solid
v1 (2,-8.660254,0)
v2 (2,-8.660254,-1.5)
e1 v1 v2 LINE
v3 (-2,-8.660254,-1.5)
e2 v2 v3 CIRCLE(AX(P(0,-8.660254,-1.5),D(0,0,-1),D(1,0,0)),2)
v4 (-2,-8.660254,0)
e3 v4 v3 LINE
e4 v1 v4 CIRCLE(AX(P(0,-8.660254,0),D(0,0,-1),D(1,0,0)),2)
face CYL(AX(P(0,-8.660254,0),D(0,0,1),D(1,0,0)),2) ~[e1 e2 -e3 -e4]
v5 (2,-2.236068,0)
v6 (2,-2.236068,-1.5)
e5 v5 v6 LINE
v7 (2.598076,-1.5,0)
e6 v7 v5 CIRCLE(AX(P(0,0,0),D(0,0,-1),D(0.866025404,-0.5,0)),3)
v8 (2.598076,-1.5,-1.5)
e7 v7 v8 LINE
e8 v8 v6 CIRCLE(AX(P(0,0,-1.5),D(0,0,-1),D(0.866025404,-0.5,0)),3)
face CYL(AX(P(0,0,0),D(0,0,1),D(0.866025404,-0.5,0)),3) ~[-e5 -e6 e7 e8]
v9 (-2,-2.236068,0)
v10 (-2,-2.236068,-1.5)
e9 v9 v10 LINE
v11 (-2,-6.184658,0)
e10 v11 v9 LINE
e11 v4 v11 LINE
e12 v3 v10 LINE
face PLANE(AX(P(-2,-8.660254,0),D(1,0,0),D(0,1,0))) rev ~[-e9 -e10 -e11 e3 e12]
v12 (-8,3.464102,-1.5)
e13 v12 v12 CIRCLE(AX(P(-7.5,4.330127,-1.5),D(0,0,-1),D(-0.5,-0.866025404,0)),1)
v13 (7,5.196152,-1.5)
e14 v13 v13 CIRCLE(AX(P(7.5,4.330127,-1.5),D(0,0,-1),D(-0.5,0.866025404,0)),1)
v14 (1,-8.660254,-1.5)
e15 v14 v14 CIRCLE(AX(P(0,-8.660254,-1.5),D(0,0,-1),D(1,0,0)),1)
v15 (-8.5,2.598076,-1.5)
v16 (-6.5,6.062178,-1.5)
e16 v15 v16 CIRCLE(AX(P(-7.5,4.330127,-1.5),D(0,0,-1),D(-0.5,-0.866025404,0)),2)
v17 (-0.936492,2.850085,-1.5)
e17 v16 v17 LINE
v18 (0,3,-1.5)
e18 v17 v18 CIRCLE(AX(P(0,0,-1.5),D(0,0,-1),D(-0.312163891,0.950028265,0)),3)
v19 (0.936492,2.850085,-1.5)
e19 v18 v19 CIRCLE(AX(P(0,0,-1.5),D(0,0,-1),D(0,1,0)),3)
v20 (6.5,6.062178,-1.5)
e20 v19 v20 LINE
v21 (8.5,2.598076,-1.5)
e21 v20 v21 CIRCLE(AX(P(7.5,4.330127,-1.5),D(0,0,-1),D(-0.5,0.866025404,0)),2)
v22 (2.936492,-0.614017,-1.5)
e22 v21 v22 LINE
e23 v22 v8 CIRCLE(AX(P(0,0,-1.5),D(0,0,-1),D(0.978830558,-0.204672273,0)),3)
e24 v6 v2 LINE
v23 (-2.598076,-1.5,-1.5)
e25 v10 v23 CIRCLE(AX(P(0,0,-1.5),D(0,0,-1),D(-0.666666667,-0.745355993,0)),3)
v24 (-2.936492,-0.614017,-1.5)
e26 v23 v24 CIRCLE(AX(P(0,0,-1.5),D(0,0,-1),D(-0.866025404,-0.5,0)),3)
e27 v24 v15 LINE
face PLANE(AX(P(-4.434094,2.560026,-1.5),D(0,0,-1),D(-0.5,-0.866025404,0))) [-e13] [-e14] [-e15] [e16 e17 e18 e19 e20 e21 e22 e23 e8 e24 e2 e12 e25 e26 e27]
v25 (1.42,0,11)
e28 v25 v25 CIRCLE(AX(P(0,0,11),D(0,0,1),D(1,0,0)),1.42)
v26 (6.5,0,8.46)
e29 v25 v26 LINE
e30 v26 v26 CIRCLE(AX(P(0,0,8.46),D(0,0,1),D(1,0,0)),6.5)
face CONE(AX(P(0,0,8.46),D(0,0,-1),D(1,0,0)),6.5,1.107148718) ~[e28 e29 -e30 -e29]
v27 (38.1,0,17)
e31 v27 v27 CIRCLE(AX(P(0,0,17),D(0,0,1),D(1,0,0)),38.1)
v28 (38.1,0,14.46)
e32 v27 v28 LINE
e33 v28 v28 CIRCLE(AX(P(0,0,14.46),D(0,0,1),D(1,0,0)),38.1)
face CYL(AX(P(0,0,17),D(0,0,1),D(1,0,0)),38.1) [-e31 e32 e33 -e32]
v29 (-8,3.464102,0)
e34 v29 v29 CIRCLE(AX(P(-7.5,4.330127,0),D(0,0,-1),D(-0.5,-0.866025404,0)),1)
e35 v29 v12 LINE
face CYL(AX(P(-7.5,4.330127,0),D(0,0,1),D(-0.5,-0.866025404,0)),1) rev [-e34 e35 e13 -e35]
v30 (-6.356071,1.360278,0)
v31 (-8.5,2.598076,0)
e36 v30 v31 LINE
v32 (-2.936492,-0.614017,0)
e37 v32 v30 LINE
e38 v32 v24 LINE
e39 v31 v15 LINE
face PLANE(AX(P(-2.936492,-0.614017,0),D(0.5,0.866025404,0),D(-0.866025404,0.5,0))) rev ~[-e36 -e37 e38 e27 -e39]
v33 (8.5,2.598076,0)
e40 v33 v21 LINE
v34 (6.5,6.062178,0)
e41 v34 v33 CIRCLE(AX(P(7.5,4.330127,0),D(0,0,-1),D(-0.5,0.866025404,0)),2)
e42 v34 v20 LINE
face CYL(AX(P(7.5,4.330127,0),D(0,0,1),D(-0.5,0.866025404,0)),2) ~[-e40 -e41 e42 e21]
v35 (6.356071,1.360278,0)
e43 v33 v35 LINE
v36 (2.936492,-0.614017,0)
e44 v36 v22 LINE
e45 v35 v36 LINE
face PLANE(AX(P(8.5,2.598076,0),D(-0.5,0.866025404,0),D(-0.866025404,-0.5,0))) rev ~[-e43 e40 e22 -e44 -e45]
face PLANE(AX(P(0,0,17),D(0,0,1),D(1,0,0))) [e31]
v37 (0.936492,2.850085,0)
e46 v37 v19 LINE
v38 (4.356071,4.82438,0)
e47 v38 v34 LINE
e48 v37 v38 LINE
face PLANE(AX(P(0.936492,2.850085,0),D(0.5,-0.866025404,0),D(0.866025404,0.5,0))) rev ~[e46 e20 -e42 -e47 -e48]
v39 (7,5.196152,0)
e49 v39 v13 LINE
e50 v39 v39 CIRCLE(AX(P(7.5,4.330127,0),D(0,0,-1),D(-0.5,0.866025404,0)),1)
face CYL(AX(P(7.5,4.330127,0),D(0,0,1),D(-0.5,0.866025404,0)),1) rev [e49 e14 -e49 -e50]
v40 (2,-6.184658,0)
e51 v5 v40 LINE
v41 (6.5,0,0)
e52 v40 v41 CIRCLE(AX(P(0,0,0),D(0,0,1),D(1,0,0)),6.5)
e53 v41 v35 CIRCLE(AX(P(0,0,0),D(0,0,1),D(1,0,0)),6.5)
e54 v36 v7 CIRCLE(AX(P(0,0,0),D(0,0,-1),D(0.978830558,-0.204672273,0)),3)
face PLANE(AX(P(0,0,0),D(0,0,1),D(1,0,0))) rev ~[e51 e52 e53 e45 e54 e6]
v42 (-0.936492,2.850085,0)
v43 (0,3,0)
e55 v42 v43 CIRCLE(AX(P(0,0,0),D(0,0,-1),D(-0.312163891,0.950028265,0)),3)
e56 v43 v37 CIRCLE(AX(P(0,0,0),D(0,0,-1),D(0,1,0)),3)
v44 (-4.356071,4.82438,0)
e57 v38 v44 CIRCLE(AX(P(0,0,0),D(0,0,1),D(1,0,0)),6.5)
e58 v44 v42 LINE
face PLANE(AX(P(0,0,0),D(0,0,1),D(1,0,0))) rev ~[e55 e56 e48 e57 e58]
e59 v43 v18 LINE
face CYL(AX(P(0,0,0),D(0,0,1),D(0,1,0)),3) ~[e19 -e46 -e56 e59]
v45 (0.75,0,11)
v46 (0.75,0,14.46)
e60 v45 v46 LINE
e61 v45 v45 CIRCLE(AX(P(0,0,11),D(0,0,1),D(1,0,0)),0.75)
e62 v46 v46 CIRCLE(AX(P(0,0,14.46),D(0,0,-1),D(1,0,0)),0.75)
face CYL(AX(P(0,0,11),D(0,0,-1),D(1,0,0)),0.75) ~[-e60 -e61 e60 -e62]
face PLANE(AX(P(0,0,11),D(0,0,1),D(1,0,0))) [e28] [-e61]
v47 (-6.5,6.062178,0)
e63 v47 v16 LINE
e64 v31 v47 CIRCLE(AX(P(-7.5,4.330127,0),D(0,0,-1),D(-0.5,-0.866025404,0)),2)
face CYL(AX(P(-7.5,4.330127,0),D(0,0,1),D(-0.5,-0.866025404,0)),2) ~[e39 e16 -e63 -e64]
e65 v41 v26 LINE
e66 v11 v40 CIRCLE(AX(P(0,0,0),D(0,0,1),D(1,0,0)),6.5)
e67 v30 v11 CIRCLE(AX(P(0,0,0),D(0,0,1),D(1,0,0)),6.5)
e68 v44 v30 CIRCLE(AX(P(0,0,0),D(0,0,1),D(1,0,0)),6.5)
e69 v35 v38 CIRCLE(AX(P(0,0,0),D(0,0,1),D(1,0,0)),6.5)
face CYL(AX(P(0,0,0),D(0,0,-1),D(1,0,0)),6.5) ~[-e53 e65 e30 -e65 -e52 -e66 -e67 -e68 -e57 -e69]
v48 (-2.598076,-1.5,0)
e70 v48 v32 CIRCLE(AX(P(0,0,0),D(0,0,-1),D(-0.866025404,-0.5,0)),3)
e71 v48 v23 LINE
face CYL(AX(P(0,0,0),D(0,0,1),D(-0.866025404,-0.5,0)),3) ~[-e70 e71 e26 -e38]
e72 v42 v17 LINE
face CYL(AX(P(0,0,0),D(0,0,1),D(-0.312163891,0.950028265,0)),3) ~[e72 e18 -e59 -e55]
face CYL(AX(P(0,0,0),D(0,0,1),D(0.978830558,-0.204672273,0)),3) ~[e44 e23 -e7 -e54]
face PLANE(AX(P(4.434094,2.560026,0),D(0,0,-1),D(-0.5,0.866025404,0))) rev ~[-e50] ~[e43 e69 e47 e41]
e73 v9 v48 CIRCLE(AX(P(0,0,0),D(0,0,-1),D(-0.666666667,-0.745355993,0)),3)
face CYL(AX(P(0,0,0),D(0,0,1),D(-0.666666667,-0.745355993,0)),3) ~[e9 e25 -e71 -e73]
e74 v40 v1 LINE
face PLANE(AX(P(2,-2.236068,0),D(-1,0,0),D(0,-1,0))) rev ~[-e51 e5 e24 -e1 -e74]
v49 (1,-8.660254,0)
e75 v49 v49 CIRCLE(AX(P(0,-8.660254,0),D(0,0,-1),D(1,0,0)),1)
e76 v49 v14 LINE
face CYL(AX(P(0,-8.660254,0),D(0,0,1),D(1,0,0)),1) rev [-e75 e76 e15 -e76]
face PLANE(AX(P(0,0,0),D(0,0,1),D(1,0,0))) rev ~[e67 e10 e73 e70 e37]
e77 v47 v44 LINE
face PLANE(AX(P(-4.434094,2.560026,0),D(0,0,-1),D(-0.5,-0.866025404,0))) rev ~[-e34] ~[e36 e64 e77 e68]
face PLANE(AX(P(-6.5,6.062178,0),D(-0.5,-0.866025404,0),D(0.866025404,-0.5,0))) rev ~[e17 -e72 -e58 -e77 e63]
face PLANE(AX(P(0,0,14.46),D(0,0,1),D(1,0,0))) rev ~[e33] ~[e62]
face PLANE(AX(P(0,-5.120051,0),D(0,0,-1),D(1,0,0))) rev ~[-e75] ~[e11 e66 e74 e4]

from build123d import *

# Parameters (mm, degrees)
F0_R            = 6.5
F1_DEPTH        = 11
F2_R            = 0.75
F3_DEPTH        = 6
F4_R            = 1
F5_DEPTH        = 1.5
F5_COPIES_COUNT = 3
F6_SIZE2        = 2.54
F6_SIZE         = 5.08
F7_R            = 38.1
F8_DEPTH        = 2.54


# Not quite as in the source:
# - a pattern or mirror of a feature is missing from the dataset's text; its kind, count and spacing are read off the source's solid


with BuildPart() as f1:
    # F0 (on Top) → F1 (new body)
    with BuildSketch(Plane.XY):
        Circle(F0_R)
    extrude(amount=F1_DEPTH)

    # F2 (on face) → F3 (join)
    with BuildSketch(Plane.XY.offset(11)):
        Circle(F2_R)
    extrude(amount=F3_DEPTH)

    # F4 (on face) → F5 (join)
    with BuildSketch(Plane(origin=(0, 0, 0), x_dir=(1, 0, 0), z_dir=(0, 0, -1))):
        with BuildLine():
            ThreePointArc((2, 8.6602540378), (0, 10.6602540378), (-2, 8.6602540378))
            Line((-2, 8.6602540378), (-2, 2.2360679775))
            ThreePointArc((-2, 2.2360679775), (-2.3283095216, 1.8918178485), (-2.5980762114, 1.5))
            Line((-2.5980762114, 1.5), (0, 0))
            Line((0, 0), (2.5980762114, 1.5))
            ThreePointArc((2.5980762114, 1.5), (2.3283095216, 1.8918178485), (2, 2.2360679775))
            Line((2, 2.2360679775), (2, 8.6602540378))
        make_face()
        with Locations((0, 8.6602540378)):
            Circle(F4_R, mode=Mode.SUBTRACT)
    f5 = extrude(amount=F5_DEPTH)

    # F5_copies: F5 ×3 about axis
    f5_copies_axis = Axis((0, 0, 0), (0, 0, 1))
    for i in range(1, F5_COPIES_COUNT):
        add(f5.rotate(f5_copies_axis, i * 360 / F5_COPIES_COUNT))

    # F6
    f6_edges = [f1.edges().sort_by_distance(p)[0] for p in [
        (-6.5, 0, 11),
    ]]
    f6_side = f1.faces().sort_by_distance((-6.316152, 0, 11))[0]
    chamfer(f6_edges, length=F6_SIZE, length2=F6_SIZE2, reference=f6_side)

    # F7 (on face) → F8 (join)
    with BuildSketch(Plane.XY.offset(17)):
        Circle(F7_R)
    extrude(amount=-F8_DEPTH)


solid = f1.part
